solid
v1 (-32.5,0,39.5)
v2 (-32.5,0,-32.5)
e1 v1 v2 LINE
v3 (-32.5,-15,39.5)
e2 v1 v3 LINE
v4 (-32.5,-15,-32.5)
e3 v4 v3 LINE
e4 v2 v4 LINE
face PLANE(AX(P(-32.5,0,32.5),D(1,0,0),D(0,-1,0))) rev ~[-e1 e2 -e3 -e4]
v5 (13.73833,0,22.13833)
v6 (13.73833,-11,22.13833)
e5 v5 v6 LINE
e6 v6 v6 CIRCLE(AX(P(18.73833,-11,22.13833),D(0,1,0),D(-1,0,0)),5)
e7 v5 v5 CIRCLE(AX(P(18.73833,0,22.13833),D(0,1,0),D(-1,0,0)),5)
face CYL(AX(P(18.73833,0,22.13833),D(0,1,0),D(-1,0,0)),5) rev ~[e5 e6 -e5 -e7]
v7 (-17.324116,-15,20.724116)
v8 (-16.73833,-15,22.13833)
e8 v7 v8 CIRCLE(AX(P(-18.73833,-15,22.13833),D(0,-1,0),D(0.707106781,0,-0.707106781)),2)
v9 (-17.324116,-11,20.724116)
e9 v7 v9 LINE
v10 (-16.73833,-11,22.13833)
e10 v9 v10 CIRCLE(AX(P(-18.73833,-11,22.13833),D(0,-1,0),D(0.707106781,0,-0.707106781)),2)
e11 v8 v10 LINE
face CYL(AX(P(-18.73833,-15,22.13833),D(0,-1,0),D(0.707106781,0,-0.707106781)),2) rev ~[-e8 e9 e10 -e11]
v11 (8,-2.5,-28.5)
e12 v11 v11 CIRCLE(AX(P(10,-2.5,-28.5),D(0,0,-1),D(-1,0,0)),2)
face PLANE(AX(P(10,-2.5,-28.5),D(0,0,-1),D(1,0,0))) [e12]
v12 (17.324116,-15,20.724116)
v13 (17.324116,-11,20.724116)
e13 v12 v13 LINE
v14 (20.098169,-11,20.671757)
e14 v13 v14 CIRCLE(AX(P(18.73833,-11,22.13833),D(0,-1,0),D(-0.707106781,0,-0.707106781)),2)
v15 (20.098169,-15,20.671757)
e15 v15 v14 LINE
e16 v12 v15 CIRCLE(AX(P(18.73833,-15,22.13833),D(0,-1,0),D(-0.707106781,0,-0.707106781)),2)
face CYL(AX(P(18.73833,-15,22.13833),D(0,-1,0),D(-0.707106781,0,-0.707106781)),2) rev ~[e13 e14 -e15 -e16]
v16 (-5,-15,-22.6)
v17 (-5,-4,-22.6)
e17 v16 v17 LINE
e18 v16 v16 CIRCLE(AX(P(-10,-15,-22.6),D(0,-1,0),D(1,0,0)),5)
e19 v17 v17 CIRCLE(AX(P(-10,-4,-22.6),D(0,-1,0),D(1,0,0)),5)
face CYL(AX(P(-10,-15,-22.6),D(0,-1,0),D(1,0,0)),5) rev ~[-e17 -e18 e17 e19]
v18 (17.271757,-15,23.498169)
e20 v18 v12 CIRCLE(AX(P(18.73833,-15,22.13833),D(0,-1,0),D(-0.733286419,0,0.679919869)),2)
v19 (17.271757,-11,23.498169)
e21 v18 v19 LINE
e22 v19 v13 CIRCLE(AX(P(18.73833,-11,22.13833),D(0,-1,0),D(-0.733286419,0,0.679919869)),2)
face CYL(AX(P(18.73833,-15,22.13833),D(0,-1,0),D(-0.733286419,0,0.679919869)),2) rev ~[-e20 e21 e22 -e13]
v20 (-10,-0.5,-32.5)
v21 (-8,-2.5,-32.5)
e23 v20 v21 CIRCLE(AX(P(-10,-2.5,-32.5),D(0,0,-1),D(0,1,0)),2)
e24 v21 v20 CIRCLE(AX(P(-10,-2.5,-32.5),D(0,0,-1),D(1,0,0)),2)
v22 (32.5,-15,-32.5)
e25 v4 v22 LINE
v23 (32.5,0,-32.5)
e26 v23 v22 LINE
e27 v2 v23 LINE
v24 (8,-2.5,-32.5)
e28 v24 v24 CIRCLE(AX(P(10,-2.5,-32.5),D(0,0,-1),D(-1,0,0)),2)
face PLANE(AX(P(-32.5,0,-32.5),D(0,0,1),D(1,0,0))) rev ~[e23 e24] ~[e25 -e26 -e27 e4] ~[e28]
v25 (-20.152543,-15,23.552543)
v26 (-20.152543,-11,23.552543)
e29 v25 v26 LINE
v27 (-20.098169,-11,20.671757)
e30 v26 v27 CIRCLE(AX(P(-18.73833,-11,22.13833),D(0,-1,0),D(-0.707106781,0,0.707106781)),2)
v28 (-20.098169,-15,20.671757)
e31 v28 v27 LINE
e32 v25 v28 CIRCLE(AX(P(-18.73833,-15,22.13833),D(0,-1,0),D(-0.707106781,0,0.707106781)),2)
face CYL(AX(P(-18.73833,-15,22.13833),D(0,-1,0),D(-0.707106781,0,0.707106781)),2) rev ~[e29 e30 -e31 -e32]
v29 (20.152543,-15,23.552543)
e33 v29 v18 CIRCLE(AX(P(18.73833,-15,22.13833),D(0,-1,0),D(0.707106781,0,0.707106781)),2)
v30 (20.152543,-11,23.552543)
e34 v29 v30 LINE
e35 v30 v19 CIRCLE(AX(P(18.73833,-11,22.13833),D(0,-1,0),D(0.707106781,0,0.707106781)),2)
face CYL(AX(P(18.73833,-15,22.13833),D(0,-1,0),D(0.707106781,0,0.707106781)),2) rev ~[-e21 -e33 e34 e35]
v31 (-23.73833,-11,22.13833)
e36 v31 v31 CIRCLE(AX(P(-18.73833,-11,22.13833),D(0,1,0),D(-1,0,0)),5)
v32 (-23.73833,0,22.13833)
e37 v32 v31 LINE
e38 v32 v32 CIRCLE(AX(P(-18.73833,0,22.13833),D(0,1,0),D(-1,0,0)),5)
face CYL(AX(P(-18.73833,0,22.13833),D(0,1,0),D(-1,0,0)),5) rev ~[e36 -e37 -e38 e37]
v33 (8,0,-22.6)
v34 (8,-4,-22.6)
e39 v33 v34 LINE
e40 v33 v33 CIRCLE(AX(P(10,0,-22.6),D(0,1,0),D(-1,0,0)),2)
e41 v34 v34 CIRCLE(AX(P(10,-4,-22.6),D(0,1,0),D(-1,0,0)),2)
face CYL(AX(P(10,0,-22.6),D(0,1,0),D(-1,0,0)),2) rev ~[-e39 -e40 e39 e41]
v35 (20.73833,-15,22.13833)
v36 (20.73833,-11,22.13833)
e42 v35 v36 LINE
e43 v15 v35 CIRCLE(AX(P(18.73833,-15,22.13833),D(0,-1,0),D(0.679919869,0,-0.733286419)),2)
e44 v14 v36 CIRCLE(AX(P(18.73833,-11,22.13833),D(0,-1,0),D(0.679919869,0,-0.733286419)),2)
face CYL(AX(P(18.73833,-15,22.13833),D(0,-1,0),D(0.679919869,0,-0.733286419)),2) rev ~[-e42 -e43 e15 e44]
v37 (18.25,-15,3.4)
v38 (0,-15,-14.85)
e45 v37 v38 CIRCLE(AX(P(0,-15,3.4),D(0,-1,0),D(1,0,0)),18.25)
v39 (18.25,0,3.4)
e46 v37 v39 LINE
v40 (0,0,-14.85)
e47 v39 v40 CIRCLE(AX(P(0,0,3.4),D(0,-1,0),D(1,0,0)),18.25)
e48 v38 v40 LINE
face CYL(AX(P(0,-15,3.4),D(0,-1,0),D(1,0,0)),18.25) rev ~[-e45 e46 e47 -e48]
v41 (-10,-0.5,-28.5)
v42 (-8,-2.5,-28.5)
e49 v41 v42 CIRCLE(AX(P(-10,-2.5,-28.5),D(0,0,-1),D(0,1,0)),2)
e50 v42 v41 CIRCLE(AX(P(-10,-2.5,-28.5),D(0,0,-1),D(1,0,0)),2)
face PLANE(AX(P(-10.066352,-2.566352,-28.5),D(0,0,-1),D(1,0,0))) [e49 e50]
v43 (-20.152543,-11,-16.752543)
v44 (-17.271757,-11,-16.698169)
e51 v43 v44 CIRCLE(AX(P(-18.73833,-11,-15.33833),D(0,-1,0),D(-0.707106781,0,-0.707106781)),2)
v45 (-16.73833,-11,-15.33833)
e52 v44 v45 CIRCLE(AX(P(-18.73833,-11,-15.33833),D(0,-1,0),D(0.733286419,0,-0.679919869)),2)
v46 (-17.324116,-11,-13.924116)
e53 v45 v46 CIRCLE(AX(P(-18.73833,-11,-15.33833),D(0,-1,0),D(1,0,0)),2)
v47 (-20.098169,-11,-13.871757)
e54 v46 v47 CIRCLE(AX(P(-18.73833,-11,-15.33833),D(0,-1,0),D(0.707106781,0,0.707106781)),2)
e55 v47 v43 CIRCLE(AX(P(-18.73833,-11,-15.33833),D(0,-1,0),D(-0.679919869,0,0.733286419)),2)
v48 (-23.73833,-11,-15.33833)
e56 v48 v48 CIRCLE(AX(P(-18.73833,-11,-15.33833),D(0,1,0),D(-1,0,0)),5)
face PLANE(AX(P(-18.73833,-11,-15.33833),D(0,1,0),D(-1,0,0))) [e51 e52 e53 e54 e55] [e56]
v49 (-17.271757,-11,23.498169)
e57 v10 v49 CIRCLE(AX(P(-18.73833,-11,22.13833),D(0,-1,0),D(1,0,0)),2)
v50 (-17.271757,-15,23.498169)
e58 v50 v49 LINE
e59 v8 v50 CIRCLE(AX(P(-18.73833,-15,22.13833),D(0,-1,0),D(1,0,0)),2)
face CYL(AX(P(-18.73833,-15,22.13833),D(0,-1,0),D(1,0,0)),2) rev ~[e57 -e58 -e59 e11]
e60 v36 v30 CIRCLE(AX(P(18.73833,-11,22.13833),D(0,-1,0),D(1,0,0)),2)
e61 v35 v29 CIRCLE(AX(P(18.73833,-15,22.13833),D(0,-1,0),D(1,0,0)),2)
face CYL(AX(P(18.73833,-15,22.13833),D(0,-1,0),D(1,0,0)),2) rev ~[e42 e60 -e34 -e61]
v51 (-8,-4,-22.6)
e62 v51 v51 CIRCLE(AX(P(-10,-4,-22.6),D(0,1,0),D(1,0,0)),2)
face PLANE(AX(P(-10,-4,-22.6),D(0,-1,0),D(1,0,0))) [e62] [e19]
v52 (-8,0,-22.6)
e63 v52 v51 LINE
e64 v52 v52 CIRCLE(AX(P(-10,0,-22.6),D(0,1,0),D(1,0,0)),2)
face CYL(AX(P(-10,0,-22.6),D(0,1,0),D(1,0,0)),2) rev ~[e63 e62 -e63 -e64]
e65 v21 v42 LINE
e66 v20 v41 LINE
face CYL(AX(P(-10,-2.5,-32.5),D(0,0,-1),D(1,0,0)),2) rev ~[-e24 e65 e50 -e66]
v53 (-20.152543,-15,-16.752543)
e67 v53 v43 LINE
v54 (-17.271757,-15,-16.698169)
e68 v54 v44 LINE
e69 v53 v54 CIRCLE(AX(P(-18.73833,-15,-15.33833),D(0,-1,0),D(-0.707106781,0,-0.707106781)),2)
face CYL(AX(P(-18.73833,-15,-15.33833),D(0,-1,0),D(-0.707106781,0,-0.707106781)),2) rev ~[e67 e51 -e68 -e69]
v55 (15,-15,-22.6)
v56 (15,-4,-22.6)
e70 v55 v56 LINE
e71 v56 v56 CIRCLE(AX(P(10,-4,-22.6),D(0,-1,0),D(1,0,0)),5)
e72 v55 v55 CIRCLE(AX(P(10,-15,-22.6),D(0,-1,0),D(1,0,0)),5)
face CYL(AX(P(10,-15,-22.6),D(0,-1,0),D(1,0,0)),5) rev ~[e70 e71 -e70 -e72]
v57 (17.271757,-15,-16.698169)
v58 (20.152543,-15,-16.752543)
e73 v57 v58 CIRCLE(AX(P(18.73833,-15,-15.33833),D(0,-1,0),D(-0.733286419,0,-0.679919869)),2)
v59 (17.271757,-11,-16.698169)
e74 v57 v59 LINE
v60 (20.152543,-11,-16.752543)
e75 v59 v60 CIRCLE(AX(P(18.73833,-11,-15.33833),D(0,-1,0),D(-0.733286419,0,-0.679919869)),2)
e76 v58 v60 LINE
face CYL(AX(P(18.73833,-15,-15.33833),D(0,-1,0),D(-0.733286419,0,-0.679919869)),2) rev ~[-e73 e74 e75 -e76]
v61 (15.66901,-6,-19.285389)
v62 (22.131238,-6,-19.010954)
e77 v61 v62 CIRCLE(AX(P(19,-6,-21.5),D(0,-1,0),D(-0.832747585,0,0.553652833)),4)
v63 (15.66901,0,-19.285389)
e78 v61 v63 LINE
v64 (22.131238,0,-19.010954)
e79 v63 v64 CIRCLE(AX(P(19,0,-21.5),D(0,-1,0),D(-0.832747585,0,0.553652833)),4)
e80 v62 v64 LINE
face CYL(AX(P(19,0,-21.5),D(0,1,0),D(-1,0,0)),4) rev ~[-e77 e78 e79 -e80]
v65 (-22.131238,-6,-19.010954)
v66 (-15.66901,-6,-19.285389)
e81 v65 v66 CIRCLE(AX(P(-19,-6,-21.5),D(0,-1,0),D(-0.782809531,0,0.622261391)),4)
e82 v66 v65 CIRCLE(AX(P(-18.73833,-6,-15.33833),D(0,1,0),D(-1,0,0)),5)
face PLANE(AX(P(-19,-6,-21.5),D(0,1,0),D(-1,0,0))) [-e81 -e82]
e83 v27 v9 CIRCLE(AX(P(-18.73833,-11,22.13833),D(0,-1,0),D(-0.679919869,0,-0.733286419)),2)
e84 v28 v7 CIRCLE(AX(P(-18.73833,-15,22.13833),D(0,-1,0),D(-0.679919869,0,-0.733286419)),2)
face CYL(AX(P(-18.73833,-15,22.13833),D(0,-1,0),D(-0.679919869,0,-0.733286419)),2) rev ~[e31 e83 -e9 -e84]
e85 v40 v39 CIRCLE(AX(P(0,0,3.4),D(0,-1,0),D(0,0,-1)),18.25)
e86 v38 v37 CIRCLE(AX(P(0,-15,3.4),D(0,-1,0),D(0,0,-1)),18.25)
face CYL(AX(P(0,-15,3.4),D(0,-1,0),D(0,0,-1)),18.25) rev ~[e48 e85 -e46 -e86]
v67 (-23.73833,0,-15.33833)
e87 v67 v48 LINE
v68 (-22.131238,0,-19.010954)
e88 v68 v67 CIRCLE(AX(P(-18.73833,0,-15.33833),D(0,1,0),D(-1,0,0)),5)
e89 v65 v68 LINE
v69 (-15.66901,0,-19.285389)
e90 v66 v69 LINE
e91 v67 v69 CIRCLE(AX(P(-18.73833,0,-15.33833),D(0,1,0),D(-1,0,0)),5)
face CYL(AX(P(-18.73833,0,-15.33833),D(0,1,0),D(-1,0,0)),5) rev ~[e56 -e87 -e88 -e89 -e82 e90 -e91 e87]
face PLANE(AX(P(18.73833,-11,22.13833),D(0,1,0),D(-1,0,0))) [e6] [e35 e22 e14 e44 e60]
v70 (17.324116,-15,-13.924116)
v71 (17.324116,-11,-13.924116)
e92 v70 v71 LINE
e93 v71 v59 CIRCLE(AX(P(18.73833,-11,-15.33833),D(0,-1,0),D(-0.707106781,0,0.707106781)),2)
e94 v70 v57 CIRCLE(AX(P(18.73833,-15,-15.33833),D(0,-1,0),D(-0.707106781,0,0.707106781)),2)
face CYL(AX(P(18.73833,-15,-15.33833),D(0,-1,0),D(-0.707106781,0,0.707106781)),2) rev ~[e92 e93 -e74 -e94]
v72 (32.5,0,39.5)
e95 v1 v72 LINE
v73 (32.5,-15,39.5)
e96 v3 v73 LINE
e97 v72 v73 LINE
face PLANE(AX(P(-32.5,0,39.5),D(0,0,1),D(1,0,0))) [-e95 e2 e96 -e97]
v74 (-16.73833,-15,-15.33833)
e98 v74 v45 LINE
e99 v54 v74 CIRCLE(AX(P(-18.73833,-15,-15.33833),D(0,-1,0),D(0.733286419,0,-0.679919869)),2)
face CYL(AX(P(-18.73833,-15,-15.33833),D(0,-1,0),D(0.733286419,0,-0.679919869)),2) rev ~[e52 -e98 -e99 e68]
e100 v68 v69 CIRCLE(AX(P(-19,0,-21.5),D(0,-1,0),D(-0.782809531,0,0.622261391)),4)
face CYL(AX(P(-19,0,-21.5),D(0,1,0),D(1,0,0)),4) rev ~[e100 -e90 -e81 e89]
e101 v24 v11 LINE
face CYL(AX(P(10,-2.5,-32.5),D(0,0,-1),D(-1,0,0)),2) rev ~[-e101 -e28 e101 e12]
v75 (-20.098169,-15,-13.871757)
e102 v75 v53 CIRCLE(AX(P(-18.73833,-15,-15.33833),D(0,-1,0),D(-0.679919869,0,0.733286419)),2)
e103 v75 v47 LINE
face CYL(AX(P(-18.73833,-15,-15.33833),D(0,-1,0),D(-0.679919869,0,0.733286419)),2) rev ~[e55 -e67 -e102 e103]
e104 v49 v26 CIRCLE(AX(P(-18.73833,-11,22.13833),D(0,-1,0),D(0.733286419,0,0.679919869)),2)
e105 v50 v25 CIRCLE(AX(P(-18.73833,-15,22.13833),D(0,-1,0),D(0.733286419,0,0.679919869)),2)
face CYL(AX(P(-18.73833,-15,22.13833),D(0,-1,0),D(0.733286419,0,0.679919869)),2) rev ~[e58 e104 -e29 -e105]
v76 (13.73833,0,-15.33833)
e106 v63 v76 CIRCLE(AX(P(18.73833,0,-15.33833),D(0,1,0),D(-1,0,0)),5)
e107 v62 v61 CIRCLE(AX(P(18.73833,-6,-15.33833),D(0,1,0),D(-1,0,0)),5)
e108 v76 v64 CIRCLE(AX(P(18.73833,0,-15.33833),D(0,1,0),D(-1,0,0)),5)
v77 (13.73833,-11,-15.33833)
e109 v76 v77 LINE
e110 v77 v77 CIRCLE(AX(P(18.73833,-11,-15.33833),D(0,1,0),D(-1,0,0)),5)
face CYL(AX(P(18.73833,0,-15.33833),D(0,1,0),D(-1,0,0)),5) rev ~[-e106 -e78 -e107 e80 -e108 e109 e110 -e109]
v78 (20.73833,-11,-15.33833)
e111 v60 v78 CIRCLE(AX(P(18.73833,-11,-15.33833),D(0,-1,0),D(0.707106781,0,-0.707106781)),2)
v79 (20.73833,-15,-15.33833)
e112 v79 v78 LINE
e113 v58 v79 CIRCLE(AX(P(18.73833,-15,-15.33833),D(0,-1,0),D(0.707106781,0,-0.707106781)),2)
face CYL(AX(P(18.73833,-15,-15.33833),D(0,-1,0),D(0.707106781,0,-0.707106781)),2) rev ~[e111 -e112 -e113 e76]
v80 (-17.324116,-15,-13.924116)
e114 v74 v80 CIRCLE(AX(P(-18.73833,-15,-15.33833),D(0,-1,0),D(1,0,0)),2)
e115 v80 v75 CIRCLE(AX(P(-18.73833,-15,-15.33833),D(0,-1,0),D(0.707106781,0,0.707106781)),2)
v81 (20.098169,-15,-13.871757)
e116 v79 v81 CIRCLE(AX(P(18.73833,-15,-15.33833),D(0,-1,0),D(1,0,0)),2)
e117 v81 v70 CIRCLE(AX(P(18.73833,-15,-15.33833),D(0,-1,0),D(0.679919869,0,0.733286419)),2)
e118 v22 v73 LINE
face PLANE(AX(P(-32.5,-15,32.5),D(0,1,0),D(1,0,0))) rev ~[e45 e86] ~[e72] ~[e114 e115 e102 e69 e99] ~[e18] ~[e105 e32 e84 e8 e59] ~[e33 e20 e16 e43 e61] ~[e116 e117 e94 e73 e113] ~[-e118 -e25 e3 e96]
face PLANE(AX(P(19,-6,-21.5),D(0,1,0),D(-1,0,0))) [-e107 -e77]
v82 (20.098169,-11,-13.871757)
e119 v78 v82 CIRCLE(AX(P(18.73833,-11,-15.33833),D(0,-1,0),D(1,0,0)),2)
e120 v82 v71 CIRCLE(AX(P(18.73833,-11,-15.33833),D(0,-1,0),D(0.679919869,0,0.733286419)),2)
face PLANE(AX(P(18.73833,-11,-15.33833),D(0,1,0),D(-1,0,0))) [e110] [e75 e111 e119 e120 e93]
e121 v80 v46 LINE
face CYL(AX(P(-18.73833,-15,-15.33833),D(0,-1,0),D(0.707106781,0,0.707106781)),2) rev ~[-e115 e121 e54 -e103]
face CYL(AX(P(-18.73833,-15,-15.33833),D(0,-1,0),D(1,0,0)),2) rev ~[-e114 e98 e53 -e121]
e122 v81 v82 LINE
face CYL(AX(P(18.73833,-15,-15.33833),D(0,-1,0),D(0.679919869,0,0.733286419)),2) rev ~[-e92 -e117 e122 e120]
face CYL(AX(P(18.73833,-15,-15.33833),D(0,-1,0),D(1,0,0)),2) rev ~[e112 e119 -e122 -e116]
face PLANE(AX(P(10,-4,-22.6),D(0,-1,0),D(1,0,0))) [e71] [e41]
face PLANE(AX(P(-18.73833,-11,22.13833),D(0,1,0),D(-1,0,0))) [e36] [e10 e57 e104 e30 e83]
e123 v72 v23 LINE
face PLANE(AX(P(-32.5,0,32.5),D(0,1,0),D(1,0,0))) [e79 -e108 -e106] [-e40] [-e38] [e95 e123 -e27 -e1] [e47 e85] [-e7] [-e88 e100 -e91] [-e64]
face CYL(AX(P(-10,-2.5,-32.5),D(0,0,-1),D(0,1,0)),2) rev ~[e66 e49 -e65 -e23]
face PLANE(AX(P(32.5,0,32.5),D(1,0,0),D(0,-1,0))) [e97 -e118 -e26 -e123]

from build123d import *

# Parameters (mm, degrees)
F0_W      = 65
F0_H      = 65
F1_DEPTH  = 15
F3_DEPTH  = 15
F5_DEPTH  = 25
F6_R      = 5
F7_DEPTH  = 11
F8_R      = 2
F9_DEPTH  = 25
F10_R     = 5
F11_DEPTH = 11
F13_DEPTH = 4
F14_R     = 4
F15_DEPTH = 6
F16_DEPTH = 7


# Not quite as in the source:
# - the program builds the solid bodies; features that only make, move or delete a surface that nothing else refers to are left out


with BuildPart() as f1:
    # F0 (on Front) → F1 (new body)
    with BuildSketch(Plane.XZ):
        Rectangle(F0_W, F0_H)
    extrude(amount=F1_DEPTH)

    # F2 (on face) → F3 (cut)
    with BuildSketch(Plane.XZ.offset(15)):
        with BuildLine():
            ThreePointArc((18.25, 3.4), (-12.9046987567, 16.3046987567), (0, -14.85))
            ThreePointArc((0, -14.85), (12.9046987567, -9.5046987567), (18.25, 3.4))
        make_face()
    extrude(amount=-F3_DEPTH, mode=Mode.SUBTRACT)

    # F4 (on face) → F5 (cut)
    with BuildSketch(Plane.XZ.offset(15)):
        with BuildLine():
            ThreePointArc((-20.0981694395, 20.6717568643), (-19.4320900923, 21.4178765299), (-18.7383297014, 22.1383297014))
            Line((-18.7383297014, 22.1383297014), (-20.1525432638, 23.5525432638))
            ThreePointArc((-20.1525432638, 23.5525432638), (-20.7379735443, 22.1005871312), (-20.0981694395, 20.6717568643))
        make_face()
        with BuildLine():
            ThreePointArc((18.7383297014, 22.1383297014), (19.4320900923, 21.4178765299), (20.0981694395, 20.6717568643))
            ThreePointArc((20.0981694395, 20.6717568643), (20.5713162639, 21.338229544), (20.7383297014, 22.1383297014))
            ThreePointArc((20.7383297014, 22.1383297014), (20.5860887665, 22.9036965662), (20.1525432638, 23.5525432638))
            Line((20.1525432638, 23.5525432638), (18.7383297014, 22.1383297014))
        make_face()
        with BuildLine():
            Line((17.3241161391, 20.7241161391), (18.7383297014, 22.1383297014))
            ThreePointArc((18.7383297014, 22.1383297014), (18.0178765299, 22.8320900923), (17.2717568643, 23.4981694395))
            ThreePointArc((17.2717568643, 23.4981694395), (16.7386858586, 22.1005871312), (17.3241161391, 20.7241161391))
        make_face()
        with BuildLine():
            ThreePointArc((17.2717568643, 23.4981694395), (18.0178765299, 22.8320900923), (18.7383297014, 22.1383297014))
            Line((18.7383297014, 22.1383297014), (20.1525432638, 23.5525432638))
            ThreePointArc((20.1525432638, 23.5525432638), (18.7005871312, 24.1379735443), (17.2717568643, 23.4981694395))
        make_face()
        with BuildLine():
            ThreePointArc((17.3241161391, 20.7241161391), (18.7005871312, 20.1386858586), (20.0981694395, 20.6717568643))
            ThreePointArc((20.0981694395, 20.6717568643), (19.4320900923, 21.4178765299), (18.7383297014, 22.1383297014))
            Line((18.7383297014, 22.1383297014), (17.3241161391, 20.7241161391))
        make_face()
        with BuildLine():
            ThreePointArc((20.7383297014, -15.3383297014), (20.5713162639, -14.538229544), (20.0981694395, -13.8717568643))
            ThreePointArc((20.0981694395, -13.8717568643), (19.4320900923, -14.6178765299), (18.7383297014, -15.3383297014))
            Line((18.7383297014, -15.3383297014), (20.1525432638, -16.7525432638))
            ThreePointArc((20.1525432638, -16.7525432638), (20.5860887665, -16.1036965662), (20.7383297014, -15.3383297014))
        make_face()
        with BuildLine():
            ThreePointArc((18.7383297014, -15.3383297014), (19.4320900923, -14.6178765299), (20.0981694395, -13.8717568643))
            ThreePointArc((20.0981694395, -13.8717568643), (18.7005871312, -13.3386858586), (17.3241161391, -13.9241161391))
            Line((17.3241161391, -13.9241161391), (18.7383297014, -15.3383297014))
        make_face()
        with BuildLine():
            Line((20.1525432638, -16.7525432638), (18.7383297014, -15.3383297014))
            ThreePointArc((18.7383297014, -15.3383297014), (18.0178765299, -16.0320900923), (17.2717568643, -16.6981694395))
            ThreePointArc((17.2717568643, -16.6981694395), (18.7005871312, -17.3379735443), (20.1525432638, -16.7525432638))
        make_face()
        with BuildLine():
            ThreePointArc((17.2717568643, -16.6981694395), (18.0178765299, -16.0320900923), (18.7383297014, -15.3383297014))
            Line((18.7383297014, -15.3383297014), (17.3241161391, -13.9241161391))
            ThreePointArc((17.3241161391, -13.9241161391), (16.7386858586, -15.3005871312), (17.2717568643, -16.6981694395))
        make_face()
        with BuildLine():
            ThreePointArc((-18.7383297014, 22.1383297014), (-18.0178765299, 22.8320900923), (-17.2717568643, 23.4981694395))
            ThreePointArc((-17.2717568643, 23.4981694395), (-18.7005871312, 24.1379735443), (-20.1525432638, 23.5525432638))
            Line((-20.1525432638, 23.5525432638), (-18.7383297014, 22.1383297014))
        make_face()
        with BuildLine():
            ThreePointArc((-16.7383297014, 22.1383297014), (-16.8764562264, 22.8686906826), (-17.2717568643, 23.4981694395))
            ThreePointArc((-17.2717568643, 23.4981694395), (-18.0178765299, 22.8320900923), (-18.7383297014, 22.1383297014))
            Line((-18.7383297014, 22.1383297014), (-17.3241161391, 20.7241161391))
            ThreePointArc((-17.3241161391, 20.7241161391), (-16.8905706364, 21.3729628367), (-16.7383297014, 22.1383297014))
        make_face()
        with BuildLine():
            Line((-17.3241161391, 20.7241161391), (-18.7383297014, 22.1383297014))
            ThreePointArc((-18.7383297014, 22.1383297014), (-19.4320900923, 21.4178765299), (-20.0981694395, 20.6717568643))
            ThreePointArc((-20.0981694395, 20.6717568643), (-18.7005871312, 20.1386858586), (-17.3241161391, 20.7241161391))
        make_face()
        with BuildLine():
            ThreePointArc((-18.7383297014, -15.3383297014), (-18.0178765299, -16.0320900923), (-17.2717568643, -16.6981694395))
            ThreePointArc((-17.2717568643, -16.6981694395), (-16.8764562264, -16.0686906826), (-16.7383297014, -15.3383297014))
            ThreePointArc((-16.7383297014, -15.3383297014), (-16.8905706364, -14.5729628367), (-17.3241161391, -13.9241161391))
            Line((-17.3241161391, -13.9241161391), (-18.7383297014, -15.3383297014))
        make_face()
        with BuildLine():
            Line((-20.1525432638, -16.7525432638), (-18.7383297014, -15.3383297014))
            ThreePointArc((-18.7383297014, -15.3383297014), (-19.4320900923, -14.6178765299), (-20.0981694395, -13.8717568643))
            ThreePointArc((-20.0981694395, -13.8717568643), (-20.7379735443, -15.3005871312), (-20.1525432638, -16.7525432638))
        make_face()
        with BuildLine():
            ThreePointArc((-20.1525432638, -16.7525432638), (-18.7005871312, -17.3379735443), (-17.2717568643, -16.6981694395))
            ThreePointArc((-17.2717568643, -16.6981694395), (-18.0178765299, -16.0320900923), (-18.7383297014, -15.3383297014))
            Line((-18.7383297014, -15.3383297014), (-20.1525432638, -16.7525432638))
        make_face()
        with BuildLine():
            ThreePointArc((-20.0981694395, -13.8717568643), (-19.4320900923, -14.6178765299), (-18.7383297014, -15.3383297014))
            Line((-18.7383297014, -15.3383297014), (-17.3241161391, -13.9241161391))
            ThreePointArc((-17.3241161391, -13.9241161391), (-18.7005871312, -13.3386858586), (-20.0981694395, -13.8717568643))
        make_face()
    extrude(amount=-F5_DEPTH, mode=Mode.SUBTRACT)

    # F6 (on face) → F7 (cut)
    with BuildSketch(Plane(origin=(0, 0, 0), x_dir=(-1, 0, 0), z_dir=(0, 1, 0))):
        with Locations((-18.7383297014, 22.1383297014)):
            Circle(F6_R)
        with Locations((18.7383297014, 22.1383297014)):
            Circle(F6_R)
        with Locations((-18.7383297014, -15.3383297014)):
            Circle(F6_R)
        with Locations((18.7383297014, -15.3383297014)):
            Circle(F6_R)
    extrude(amount=-F7_DEPTH, mode=Mode.SUBTRACT)

    # F8 (on face) → F9 (cut)
    with BuildSketch(Plane(origin=(0, 0, 0), x_dir=(-1, 0, 0), z_dir=(0, 1, 0))):
        with BuildLine():
            ThreePointArc((12, -22.6), (10, -20.6), (8, -22.6))
            ThreePointArc((8, -22.6), (10, -24.6), (12, -22.6))
        make_face()
        with Locations((-10, -22.6)):
            Circle(F8_R)
    extrude(amount=-F9_DEPTH, mode=Mode.SUBTRACT)

    # F10 (on face) → F11 (cut)
    with BuildSketch(Plane.XZ.offset(15)):
        with Locations((-10, -22.6)):
            Circle(F10_R)
        with Locations((10, -22.6)):
            Circle(F10_R)
    extrude(amount=-F11_DEPTH, mode=Mode.SUBTRACT)

    # F12 (on face) → F13 (cut)
    with BuildSketch(Plane(origin=(0, 0, -32.5), x_dir=(1, 0, 0), z_dir=(0, 0, -1))):
        with BuildLine():
            ThreePointArc((-8, 2.5), (-11.4142135624, 3.9142135624), (-10, 0.5))
            Line((-10, 0.5), (-10, 2.5))
            Line((-10, 2.5), (-8, 2.5))
        make_face()
        with BuildLine():
            ThreePointArc((12, 2.5), (10, 4.5), (8, 2.5))
            ThreePointArc((8, 2.5), (10, 0.5), (12, 2.5))
        make_face()
        with BuildLine():
            Line((-10, 2.5), (-10, 0.5))
            ThreePointArc((-10, 0.5), (-8.5857864376, 1.0857864376), (-8, 2.5))
            Line((-8, 2.5), (-10, 2.5))
        make_face()
    extrude(amount=-F13_DEPTH, mode=Mode.SUBTRACT)

    # F14 (on face) → F15 (cut)
    with BuildSketch(Plane(origin=(0, 0, 0), x_dir=(-1, 0, 0), z_dir=(0, 1, 0))):
        with Locations((-19, -21.5)):
            Circle(F14_R)
        with BuildLine():
            ThreePointArc((23, -21.5), (19, -17.5), (15, -21.5))
            ThreePointArc((15, -21.5), (19, -25.5), (23, -21.5))
        make_face()
    extrude(amount=-F15_DEPTH, mode=Mode.SUBTRACT)

    # F16 (add): a face of the model
    f16_faces = [f1.faces().sort_by_distance(p)[0] for p in [
        (0, -7.5, 32.5),
    ]]
    extrude(f16_faces, amount=F16_DEPTH)


solid = f1.part
